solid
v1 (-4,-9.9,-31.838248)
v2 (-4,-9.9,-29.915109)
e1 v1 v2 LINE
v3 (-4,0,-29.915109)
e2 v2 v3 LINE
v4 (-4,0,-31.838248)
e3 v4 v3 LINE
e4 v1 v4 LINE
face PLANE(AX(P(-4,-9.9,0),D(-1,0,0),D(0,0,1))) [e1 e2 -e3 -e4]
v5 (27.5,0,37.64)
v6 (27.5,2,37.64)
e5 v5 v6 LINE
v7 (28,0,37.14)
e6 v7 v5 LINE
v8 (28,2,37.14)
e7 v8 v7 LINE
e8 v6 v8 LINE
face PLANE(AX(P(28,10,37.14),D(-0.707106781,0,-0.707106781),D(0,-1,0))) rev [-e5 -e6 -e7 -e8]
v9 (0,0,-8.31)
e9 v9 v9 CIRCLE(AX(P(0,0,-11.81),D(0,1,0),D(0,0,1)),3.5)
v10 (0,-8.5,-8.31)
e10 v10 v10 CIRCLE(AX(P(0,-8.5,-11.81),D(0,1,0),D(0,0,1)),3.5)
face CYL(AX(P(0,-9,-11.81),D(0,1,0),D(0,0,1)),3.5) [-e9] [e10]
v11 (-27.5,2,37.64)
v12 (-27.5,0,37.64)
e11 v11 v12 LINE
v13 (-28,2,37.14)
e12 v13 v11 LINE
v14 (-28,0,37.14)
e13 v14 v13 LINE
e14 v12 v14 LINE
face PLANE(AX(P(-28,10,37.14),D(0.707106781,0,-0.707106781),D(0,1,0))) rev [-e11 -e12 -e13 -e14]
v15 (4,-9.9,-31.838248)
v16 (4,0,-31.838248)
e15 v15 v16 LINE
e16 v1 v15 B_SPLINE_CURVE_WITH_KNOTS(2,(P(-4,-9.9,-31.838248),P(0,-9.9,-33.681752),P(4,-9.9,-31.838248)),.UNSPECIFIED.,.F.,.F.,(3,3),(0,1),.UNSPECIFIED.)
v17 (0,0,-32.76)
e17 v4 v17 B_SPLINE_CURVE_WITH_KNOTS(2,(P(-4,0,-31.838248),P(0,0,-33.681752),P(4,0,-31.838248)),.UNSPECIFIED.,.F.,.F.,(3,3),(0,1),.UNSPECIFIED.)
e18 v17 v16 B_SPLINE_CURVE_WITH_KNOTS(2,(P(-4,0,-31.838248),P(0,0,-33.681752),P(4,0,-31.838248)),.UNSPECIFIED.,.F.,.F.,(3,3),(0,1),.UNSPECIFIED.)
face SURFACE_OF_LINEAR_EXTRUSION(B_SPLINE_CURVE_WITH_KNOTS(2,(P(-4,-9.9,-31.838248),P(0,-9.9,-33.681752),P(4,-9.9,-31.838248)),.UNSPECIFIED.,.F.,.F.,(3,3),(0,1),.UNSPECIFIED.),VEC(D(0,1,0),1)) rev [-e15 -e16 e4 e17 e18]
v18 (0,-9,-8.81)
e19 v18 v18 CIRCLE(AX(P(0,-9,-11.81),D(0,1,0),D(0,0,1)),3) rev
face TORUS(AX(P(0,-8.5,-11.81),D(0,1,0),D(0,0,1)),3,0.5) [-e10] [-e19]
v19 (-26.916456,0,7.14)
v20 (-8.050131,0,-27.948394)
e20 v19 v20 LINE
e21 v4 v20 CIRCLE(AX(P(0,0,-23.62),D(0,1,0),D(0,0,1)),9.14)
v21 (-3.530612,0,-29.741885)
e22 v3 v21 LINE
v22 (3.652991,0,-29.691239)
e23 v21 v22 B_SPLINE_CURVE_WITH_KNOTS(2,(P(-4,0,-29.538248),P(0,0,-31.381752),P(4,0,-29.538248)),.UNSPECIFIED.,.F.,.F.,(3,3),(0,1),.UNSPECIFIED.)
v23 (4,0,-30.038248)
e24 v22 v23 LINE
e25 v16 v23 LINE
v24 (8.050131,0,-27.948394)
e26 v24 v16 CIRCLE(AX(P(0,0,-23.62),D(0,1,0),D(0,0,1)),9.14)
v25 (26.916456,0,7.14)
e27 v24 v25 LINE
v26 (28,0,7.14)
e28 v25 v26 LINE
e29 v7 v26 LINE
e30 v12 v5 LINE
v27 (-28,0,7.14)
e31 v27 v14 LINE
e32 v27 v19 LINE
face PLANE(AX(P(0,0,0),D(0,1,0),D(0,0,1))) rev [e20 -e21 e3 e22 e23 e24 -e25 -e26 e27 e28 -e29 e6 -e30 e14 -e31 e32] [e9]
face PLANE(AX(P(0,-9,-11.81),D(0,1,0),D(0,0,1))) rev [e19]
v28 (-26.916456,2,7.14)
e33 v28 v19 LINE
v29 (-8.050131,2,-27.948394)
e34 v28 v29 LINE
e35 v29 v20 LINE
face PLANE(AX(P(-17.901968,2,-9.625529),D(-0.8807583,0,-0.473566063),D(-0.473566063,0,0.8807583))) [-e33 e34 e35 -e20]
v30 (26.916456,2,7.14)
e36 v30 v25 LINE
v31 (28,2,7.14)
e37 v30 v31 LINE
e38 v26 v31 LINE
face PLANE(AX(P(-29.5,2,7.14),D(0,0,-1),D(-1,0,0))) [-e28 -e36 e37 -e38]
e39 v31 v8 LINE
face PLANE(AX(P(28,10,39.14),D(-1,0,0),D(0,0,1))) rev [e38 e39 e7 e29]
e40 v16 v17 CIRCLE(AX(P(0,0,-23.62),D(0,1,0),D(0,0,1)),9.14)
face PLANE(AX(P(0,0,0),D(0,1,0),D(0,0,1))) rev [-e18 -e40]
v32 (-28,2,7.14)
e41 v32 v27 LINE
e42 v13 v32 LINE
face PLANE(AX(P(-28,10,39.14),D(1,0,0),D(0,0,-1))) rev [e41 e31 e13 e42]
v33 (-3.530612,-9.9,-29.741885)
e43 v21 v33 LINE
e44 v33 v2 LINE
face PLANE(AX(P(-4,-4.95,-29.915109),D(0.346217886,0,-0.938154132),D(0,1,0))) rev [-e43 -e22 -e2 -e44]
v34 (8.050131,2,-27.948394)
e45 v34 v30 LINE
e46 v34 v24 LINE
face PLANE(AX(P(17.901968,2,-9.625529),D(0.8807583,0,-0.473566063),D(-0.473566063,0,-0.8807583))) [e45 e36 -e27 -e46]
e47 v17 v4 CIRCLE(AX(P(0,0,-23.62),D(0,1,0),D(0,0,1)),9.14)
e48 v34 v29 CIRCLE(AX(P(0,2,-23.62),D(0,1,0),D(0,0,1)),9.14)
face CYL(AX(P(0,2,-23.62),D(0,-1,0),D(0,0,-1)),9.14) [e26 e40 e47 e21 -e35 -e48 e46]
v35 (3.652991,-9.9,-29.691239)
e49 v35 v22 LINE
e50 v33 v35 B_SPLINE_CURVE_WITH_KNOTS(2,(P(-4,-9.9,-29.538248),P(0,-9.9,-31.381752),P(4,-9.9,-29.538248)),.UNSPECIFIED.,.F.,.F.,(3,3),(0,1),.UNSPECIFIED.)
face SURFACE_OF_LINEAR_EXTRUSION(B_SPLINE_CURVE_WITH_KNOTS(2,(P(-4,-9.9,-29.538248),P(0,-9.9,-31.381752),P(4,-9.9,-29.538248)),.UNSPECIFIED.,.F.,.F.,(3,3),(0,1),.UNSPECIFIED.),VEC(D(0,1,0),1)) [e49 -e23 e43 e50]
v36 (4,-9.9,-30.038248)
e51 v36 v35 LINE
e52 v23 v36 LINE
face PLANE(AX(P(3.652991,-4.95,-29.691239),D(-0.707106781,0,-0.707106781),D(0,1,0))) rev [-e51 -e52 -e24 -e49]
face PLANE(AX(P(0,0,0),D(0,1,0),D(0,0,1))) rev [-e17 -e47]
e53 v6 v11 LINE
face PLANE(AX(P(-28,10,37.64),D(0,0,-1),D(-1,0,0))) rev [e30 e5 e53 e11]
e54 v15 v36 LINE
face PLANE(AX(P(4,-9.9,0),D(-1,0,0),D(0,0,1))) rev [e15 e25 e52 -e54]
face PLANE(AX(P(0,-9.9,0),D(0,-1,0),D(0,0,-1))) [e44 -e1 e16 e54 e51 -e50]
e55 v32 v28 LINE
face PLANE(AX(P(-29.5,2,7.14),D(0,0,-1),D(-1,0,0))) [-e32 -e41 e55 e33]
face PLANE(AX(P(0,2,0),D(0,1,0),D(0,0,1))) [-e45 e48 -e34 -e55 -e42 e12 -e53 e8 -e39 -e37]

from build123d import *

# Parameters (mm, degrees)
BOSS_EXTRUDE1_DEPTH = 2
SKETCH1_21_R        = 3.5
BOSS_EXTRUDE4_DEPTH = 9
FILLET2_R           = 0.5
BOSS_EXTRUDE5_DEPTH = 9.9
CHAMFER1_START      = -11
CHAMFER1_DEPTH      = 11
SKETCH7_W           = 1.5
SKETCH7_H           = 32
CUT_EXTRUDE2_DEPTH  = 10
SKETCH8_W           = 56
SKETCH8_H           = 1.5
CUT_EXTRUDE3_DEPTH  = 10
CHAMFER3_SIZE       = 0.5


with BuildPart() as part:
    # Sketch1 → Boss-Extrude1 (new body)
    with BuildSketch(Plane(origin=(0, 0, 0), x_dir=(1, 0, 0), z_dir=(0, 1, 0))):
        with BuildLine():
            Line((26.916456077, -7.14), (8.050130866, 27.948393818))
            ThreePointArc((8.050130866, 27.948393818), (0, 32.76), (-8.050130866, 27.948393818))
            Line((-8.050130866, 27.948393818), (-26.916456077, -7.14))
            Line((-26.916456077, -7.14), (-29.5, -7.14))
            Line((-29.5, -7.14), (-29.5, -39.14))
            Line((-29.5, -39.14), (29.5, -39.14))
            Line((29.5, -39.14), (29.5, -7.14))
            Line((29.5, -7.14), (26.916456077, -7.14))
        make_face()
    extrude(amount=BOSS_EXTRUDE1_DEPTH)

    # Sketch1<21> → Boss-Extrude4 (add)
    with BuildSketch(Plane(origin=(0, 0, 0), x_dir=(1, 0, 0), z_dir=(0, 1, 0))):
        with Locations(Location((0, 11.81, 0), (0, 0, 270))):
            Circle(SKETCH1_21_R)
    extrude(amount=-BOSS_EXTRUDE4_DEPTH)

    # Fillet2
    fillet2_edges = [part.edges().sort_by_distance(p)[0] for p in [
        (0, -9, -15.31),
    ]]
    fillet(fillet2_edges, radius=FILLET2_R)


with BuildPart() as boss_extrude5_tool:
    # Sketch5 → Boss-Extrude5 (new body)
    with BuildSketch(Plane.XZ):
        with BuildLine():
            Line((-4, -31.838247988), (-4, -29.538247988))
            add(Edge.make_bspline(
                [(-4, -29.538247988), (0, -31.381752012), (4, -29.538247988)],
                knots=[0, 0, 0, 1, 1, 1], degree=2))
            Line((4, -29.538247988), (4, -31.838247988))
            add(Edge.make_bspline(
                [(-4, -31.838247988), (0, -33.681752012), (4, -31.838247988)],
                knots=[0, 0, 0, 1, 1, 1], degree=2))
        make_face()
    extrude(amount=BOSS_EXTRUDE5_DEPTH)


with BuildPart() as part_1:
    add(part.part)


with BuildPart() as part_2:
    # Boss-Extrude5: joined with boss_extrude5_tool
    add(part_1.part.fuse(boss_extrude5_tool.part, tol=0.00001))

    # Chamfer1: read off the stored shape, not the designer's step
    # Chamfer1 outline → Chamfer1 (cut)
    with BuildSketch(Plane(origin=(0, 0, 0), x_dir=(1, 0, 0), z_dir=(0, 1, 0)).offset(CHAMFER1_START)):
        with BuildLine():
            add(Edge.make_bspline(
                [(-4, 29.538247988), (-3.765305918, 29.64641286), (-3.530611836, 29.741884903)],
                knots=[0, 0, 0, 0.05867352, 0.05867352, 0.05867352], degree=2))
            Line((-3.530611836, 29.741884903), (-4, 29.915108654))
            Line((-4, 29.915108654), (-4, 29.538247988))
        make_face()
        with BuildLine():
            Line((4, 30.038247988), (3.652991042, 29.69123903))
            add(Edge.make_bspline(
                [(3.652991042, 29.69123903), (3.826495521, 29.61821204), (4, 29.538247988)],
                knots=[0.95662388, 0.95662388, 0.95662388, 1, 1, 1], degree=2))
            Line((4, 29.538247988), (4, 30.038247988))
        make_face()
    extrude(amount=CHAMFER1_DEPTH, mode=Mode.SUBTRACT)

    # Sketch7 → Cut-Extrude2 (cut)
    with BuildSketch(Plane.XZ):
        with Locations((28.75, 23.14)):
            Rectangle(SKETCH7_W, SKETCH7_H)
        with Locations((-28.75, 23.14)):
            Rectangle(SKETCH7_W, SKETCH7_H)
    extrude(amount=-CUT_EXTRUDE2_DEPTH, mode=Mode.SUBTRACT)

    # Sketch8 → Cut-Extrude3 (cut)
    with BuildSketch(Plane.XZ):
        with Locations((0, 38.39)):
            Rectangle(SKETCH8_W, SKETCH8_H)
    extrude(amount=-CUT_EXTRUDE3_DEPTH, mode=Mode.SUBTRACT)

    # Chamfer3
    chamfer3_edges = [part_2.edges().sort_by_distance(p)[0] for p in [
        (-28, 1, 37.64),
        (28, 1, 37.64),
    ]]
    chamfer(chamfer3_edges, length=CHAMFER3_SIZE)


solid = part_2.part
